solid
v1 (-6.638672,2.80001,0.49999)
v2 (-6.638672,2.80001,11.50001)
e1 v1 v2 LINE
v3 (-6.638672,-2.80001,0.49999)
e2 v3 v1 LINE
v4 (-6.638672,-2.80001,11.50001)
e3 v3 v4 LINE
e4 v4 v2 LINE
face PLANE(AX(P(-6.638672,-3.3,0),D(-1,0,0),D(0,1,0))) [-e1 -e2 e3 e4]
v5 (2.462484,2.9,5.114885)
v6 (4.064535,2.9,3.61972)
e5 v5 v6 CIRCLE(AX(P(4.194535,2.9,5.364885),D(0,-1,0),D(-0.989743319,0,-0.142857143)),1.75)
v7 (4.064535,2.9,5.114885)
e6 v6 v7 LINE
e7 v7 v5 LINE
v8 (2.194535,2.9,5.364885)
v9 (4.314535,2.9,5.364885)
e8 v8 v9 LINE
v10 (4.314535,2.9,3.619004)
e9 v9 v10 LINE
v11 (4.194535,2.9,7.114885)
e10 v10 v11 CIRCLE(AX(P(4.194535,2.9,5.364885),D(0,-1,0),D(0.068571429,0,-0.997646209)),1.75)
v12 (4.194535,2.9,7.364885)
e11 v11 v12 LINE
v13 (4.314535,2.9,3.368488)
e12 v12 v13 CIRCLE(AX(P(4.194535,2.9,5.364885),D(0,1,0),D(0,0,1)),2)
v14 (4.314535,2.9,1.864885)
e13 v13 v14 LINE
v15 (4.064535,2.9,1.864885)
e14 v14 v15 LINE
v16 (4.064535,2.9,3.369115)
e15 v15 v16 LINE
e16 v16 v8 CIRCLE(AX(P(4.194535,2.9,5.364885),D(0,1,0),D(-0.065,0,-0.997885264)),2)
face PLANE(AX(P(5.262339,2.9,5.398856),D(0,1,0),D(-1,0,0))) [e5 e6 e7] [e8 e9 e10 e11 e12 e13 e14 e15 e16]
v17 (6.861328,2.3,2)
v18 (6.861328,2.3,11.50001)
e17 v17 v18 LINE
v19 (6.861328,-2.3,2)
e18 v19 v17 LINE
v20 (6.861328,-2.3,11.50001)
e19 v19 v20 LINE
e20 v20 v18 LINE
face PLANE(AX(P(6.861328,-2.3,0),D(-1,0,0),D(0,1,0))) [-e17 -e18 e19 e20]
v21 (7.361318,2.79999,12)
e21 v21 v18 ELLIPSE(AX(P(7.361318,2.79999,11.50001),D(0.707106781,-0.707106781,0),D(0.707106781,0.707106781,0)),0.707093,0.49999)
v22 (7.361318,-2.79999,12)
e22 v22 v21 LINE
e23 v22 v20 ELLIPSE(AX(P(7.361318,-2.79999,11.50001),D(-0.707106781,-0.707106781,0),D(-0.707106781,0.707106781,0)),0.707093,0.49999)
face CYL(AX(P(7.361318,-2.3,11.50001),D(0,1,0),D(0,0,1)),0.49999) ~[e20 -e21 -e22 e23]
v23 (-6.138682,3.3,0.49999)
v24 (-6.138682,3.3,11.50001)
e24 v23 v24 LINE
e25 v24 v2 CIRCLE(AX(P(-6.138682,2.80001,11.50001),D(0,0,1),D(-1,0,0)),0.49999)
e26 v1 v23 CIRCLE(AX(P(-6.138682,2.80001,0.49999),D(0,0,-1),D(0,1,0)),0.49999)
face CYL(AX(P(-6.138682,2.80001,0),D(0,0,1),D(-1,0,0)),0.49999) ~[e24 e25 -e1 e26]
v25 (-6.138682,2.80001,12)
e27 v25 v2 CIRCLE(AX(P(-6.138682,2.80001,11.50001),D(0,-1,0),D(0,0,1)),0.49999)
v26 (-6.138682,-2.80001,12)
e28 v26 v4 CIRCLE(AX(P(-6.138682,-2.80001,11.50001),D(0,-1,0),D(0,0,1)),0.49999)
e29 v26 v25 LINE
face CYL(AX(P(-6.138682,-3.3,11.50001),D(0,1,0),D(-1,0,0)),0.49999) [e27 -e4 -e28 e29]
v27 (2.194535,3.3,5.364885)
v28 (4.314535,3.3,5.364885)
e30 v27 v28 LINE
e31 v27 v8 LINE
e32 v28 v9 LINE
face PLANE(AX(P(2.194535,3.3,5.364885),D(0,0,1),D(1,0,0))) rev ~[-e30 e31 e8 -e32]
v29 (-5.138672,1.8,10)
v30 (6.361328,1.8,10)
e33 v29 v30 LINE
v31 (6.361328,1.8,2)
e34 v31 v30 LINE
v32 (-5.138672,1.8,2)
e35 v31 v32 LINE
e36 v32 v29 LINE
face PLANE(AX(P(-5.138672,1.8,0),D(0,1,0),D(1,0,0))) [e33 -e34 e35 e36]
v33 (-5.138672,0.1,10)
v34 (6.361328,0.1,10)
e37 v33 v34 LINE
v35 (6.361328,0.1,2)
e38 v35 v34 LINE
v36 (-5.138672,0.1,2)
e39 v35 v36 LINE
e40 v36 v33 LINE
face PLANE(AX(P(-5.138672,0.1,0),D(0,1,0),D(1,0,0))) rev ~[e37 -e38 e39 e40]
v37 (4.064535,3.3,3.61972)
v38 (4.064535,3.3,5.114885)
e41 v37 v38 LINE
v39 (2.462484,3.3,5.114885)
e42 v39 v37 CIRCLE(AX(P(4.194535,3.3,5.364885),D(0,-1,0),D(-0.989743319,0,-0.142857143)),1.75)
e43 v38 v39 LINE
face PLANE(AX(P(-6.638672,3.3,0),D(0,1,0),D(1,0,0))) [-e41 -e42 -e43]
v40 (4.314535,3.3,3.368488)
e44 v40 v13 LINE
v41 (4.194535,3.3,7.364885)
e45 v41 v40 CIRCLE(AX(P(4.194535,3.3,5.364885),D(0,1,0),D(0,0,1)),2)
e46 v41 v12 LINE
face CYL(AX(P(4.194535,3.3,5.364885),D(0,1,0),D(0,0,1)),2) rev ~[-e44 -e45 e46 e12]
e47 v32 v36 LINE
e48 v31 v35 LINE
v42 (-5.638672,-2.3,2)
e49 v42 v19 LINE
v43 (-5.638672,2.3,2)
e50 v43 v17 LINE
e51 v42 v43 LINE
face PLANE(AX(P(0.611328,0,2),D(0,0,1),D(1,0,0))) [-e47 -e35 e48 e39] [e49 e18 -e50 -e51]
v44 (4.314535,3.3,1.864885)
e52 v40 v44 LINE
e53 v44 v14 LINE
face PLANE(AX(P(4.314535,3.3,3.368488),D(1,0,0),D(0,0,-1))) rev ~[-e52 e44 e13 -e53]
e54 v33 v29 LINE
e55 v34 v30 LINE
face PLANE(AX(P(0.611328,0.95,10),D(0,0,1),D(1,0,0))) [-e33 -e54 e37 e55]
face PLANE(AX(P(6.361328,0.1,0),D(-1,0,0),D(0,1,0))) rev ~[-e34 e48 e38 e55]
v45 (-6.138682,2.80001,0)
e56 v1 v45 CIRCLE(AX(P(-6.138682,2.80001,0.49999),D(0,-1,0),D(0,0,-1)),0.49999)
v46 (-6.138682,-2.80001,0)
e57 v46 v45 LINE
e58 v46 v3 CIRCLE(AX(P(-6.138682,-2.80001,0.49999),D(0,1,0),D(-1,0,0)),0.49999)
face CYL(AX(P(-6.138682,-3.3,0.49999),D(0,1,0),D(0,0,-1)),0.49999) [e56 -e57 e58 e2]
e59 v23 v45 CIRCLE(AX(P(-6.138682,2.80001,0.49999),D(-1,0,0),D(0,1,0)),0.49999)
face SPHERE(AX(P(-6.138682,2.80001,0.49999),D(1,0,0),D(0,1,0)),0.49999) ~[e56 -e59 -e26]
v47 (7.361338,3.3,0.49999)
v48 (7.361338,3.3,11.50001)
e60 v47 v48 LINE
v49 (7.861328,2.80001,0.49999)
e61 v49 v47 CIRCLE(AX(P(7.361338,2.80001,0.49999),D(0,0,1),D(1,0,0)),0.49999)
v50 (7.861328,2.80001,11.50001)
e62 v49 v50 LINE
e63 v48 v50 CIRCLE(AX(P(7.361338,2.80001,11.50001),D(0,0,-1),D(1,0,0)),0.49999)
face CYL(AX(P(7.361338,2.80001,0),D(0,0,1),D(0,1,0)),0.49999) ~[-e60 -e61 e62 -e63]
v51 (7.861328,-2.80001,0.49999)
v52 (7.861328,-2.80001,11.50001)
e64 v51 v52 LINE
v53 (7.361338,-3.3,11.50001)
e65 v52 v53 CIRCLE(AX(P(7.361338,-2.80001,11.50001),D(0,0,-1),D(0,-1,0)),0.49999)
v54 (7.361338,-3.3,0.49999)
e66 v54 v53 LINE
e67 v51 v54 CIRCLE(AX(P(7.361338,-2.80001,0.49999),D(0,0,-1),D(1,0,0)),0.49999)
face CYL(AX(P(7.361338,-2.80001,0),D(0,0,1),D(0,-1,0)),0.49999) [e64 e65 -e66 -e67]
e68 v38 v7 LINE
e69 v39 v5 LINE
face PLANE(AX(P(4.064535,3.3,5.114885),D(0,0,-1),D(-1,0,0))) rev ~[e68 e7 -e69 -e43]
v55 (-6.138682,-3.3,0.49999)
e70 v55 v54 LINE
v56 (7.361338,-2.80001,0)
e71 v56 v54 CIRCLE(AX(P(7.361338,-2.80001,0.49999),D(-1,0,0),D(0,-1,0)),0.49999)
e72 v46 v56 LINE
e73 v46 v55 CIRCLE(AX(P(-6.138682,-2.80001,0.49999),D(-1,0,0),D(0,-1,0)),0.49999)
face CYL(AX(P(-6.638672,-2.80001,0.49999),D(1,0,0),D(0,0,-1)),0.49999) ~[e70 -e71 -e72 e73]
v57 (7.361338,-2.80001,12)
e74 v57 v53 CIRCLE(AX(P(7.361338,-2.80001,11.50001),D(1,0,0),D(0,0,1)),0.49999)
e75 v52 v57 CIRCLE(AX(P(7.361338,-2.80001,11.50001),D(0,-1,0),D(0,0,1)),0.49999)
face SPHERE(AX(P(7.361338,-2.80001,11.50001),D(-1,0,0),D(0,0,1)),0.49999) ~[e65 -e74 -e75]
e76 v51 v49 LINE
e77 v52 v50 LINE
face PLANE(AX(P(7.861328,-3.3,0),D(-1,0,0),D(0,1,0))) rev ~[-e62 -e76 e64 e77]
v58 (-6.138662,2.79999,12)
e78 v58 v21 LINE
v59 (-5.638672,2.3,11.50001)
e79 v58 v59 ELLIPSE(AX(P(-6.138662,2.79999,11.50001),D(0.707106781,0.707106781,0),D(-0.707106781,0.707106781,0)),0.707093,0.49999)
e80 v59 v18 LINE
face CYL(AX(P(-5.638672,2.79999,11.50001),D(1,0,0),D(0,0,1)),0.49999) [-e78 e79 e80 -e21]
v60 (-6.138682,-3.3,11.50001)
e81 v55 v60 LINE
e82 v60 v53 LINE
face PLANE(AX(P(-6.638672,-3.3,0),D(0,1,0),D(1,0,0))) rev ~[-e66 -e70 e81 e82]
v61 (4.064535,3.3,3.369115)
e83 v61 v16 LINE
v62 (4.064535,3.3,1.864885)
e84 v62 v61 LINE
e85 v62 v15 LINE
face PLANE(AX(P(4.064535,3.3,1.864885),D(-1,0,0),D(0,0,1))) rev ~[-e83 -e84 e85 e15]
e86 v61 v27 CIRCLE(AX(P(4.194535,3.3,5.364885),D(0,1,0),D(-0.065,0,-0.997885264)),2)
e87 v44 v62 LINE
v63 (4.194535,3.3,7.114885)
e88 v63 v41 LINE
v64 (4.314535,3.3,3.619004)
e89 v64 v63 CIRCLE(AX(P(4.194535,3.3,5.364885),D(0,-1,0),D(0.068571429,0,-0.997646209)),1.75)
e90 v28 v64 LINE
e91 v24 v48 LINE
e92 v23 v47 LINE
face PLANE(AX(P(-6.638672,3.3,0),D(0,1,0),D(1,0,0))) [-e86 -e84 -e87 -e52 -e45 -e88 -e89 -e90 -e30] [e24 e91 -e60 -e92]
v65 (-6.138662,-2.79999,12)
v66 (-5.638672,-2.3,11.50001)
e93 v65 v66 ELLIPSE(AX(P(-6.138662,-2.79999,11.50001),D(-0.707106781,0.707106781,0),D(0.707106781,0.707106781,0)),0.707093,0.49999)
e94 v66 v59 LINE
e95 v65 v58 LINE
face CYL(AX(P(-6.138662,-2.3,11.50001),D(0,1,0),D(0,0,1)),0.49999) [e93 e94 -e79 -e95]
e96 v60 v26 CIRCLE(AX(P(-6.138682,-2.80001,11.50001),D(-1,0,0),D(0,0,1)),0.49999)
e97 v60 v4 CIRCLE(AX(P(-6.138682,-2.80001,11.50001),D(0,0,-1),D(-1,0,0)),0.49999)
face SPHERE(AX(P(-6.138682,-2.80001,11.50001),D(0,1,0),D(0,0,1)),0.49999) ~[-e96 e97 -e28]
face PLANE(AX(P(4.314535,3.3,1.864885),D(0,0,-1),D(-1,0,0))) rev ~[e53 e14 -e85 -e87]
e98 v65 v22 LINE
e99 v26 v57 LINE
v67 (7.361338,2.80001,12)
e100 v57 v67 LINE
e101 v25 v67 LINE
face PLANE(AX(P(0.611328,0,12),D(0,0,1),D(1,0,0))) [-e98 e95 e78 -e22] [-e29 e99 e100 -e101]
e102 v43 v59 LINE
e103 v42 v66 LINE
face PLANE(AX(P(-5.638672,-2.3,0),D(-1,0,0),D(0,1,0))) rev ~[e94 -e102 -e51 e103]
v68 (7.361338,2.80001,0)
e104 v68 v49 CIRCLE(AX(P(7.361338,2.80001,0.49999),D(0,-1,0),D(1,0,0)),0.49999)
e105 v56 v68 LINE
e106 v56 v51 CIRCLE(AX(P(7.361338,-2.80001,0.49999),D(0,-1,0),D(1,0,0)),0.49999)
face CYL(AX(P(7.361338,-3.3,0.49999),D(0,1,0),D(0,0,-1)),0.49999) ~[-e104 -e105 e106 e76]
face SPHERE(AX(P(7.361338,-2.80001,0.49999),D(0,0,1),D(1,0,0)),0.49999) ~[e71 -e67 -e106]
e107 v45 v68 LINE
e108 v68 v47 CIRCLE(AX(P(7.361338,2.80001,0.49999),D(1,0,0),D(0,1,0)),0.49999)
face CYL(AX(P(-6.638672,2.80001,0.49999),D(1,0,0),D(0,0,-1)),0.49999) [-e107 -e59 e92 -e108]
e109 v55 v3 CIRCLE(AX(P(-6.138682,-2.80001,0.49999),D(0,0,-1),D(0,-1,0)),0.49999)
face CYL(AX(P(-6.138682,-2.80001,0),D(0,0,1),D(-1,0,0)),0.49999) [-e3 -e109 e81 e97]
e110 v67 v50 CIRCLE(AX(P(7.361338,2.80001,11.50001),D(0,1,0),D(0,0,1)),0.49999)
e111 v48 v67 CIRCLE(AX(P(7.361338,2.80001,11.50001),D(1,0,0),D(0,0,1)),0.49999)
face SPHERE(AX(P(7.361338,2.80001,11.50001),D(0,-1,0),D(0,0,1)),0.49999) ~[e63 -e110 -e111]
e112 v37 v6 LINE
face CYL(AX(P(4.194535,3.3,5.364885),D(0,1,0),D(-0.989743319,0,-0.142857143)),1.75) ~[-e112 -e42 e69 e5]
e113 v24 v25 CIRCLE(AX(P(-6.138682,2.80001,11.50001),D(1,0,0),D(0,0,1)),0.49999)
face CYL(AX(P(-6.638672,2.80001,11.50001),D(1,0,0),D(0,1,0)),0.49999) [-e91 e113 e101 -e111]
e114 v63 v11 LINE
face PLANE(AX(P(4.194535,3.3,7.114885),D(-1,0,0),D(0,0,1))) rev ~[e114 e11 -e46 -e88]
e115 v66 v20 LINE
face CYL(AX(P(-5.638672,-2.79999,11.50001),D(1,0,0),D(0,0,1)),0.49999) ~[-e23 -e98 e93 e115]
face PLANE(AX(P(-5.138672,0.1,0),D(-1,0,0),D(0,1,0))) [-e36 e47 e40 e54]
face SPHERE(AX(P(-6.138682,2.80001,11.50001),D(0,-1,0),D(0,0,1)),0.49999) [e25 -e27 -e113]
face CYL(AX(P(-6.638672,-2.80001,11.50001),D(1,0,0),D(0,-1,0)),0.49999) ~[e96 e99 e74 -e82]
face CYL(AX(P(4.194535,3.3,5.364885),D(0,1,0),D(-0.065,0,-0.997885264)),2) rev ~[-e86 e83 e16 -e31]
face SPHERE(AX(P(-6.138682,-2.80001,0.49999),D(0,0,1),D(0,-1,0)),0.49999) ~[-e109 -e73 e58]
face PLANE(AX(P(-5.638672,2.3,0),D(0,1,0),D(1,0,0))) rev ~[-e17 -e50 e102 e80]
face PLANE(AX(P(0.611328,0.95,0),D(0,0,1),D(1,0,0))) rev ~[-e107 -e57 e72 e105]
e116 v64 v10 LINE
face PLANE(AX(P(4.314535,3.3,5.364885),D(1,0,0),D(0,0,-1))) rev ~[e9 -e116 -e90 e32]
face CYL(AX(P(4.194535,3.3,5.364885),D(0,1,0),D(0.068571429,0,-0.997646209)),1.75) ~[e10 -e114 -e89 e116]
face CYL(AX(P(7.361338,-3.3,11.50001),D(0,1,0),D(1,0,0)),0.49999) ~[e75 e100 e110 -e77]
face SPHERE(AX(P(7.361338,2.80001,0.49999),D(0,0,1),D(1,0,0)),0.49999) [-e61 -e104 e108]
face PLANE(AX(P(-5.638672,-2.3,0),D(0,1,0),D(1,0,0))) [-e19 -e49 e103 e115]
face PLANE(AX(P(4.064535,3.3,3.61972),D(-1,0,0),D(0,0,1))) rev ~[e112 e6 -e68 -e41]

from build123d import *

# Parameters (mm, degrees)
F0_W     = 14.5
F0_H     = 6.6
F0_W_2   = 12.5
F0_H_2   = 4.6
F1_DEPTH = 12
F0_W_3   = 11.5
F0_H_3   = 1.7
F2_DEPTH = 2
F3_DEPTH = 10
F4_R     = 0.49999
F6_DEPTH = 0.4


# Not quite as in the source:
# - a fillet or chamfer is up to 0.001 mm smaller than in the source, because OpenCascade refuses the exact size


with BuildPart() as f1:
    # F0 (on Top) → F1 (new body)
    with BuildSketch(Plane.XY):
        with Locations((0.6113282288, 0)):
            Rectangle(F0_W, F0_H)
        with Locations((0.6113282288, 0)):
            Rectangle(F0_W_2, F0_H_2, mode=Mode.SUBTRACT)
    extrude(amount=F1_DEPTH)

    # F0 (on Top) → F2 (join)
    with BuildSketch(Plane.XY):
        with Locations((0.6113282288, 0)):
            Rectangle(F0_W_2, F0_H_2)
        with Locations((0.6113282288, 0.95)):
            Rectangle(F0_W_3, F0_H_3, mode=Mode.SUBTRACT)
        with Locations((0.6113282288, 0.95)):
            Rectangle(F0_W_3, F0_H_3)
    extrude(amount=F2_DEPTH)

    # F0 (on Top) → F3 (join)
    with BuildSketch(Plane.XY):
        with Locations((0.6113282288, 0.95)):
            Rectangle(F0_W_3, F0_H_3)
    extrude(amount=F3_DEPTH)

    # F4 (radius 0.5 in the source; OpenCascade refuses exactly that, so slightly less here)
    f4_edges = [f1.edges().sort_by_distance(p)[0] for p in [
        (-6.638672, 0, 12),
        (0.611328, -3.3, 12),
        (7.861328, 0, 12),
        (0.611328, 3.3, 12),
        (-5.638672, 0, 12),
        (0.611328, 2.3, 12),
        (6.861328, 0, 12),
        (0.611328, -2.3, 12),
        (7.861328, 3.3, 6),
        (7.861328, -3.3, 6),
        (7.861328, 0, 0),
        (0.611328, 3.3, 0),
        (-6.638672, 3.3, 6),
        (-6.638672, -3.3, 6),
        (0.611328, -3.3, 0),
        (-6.638672, 0, 0),
    ]]
    fillet(f4_edges, radius=F4_R)

    # F5 (on face) → F6 (cut)
    with BuildSketch(Plane(origin=(0, 3.3, 0), x_dir=(-1, 0, 0), z_dir=(0, 1, 0))):
        with BuildLine():
            Line((-4.1945352975, 7.1148852238), (-4.1945352975, 7.3648852238))
            ThreePointArc((-4.1945352975, 7.3648852238), (-6.193634283, 5.4249122664), (-4.3145352975, 3.3684884696))
            Line((-4.3145352975, 3.3684884696), (-4.3145352975, 3.6190043573))
            ThreePointArc((-4.3145352975, 3.6190043573), (-5.9435052109, 5.4249205618), (-4.1945352975, 7.1148852238))
        make_face()
        with BuildLine():
            Line((-4.3145352975, 3.6190043573), (-4.3145352975, 3.3684884696))
            ThreePointArc((-4.3145352975, 3.3684884696), (-4.1895255031, 3.3648914983), (-4.0645352975, 3.3691146959))
            Line((-4.0645352975, 3.3691146959), (-4.0645352975, 3.6197204751))
            ThreePointArc((-4.0645352975, 3.6197204751), (-4.1895224932, 3.6148924033), (-4.3145352975, 3.6190043573))
        make_face()
        with BuildLine():
            ThreePointArc((-4.0645352975, 3.3691146959), (-4.1895255031, 3.3648914983), (-4.3145352975, 3.3684884696))
            Line((-4.3145352975, 3.3684884696), (-4.3145352975, 1.8648852238))
            Line((-4.3145352975, 1.8648852238), (-4.0645352975, 1.8648852238))
            Line((-4.0645352975, 1.8648852238), (-4.0645352975, 3.3691146959))
        make_face()
        with BuildLine():
            Line((-4.0645352975, 3.6197204751), (-4.0645352975, 3.3691146959))
            ThreePointArc((-4.0645352975, 3.3691146959), (-2.7350833455, 3.9974057907), (-2.1945352975, 5.3648852238))
            Line((-2.1945352975, 5.3648852238), (-2.4445352975, 5.3648852238))
            ThreePointArc((-2.4445352975, 5.3648852238), (-2.4490283635, 5.2395634644), (-2.4624844899, 5.1148852238))
            ThreePointArc((-2.4624844899, 5.1148852238), (-3.000513644, 4.0855055729), (-4.0645352975, 3.6197204751))
        make_face()
        with BuildLine():
            Line((-4.3145352975, 5.3648852238), (-4.3145352975, 3.6190043573))
            ThreePointArc((-4.3145352975, 3.6190043573), (-4.1895224932, 3.6148924033), (-4.0645352975, 3.6197204751))
            Line((-4.0645352975, 3.6197204751), (-4.0645352975, 5.1148852238))
            Line((-4.0645352975, 5.1148852238), (-2.4624844899, 5.1148852238))
            ThreePointArc((-2.4624844899, 5.1148852238), (-2.4490283635, 5.2395634644), (-2.4445352975, 5.3648852238))
            Line((-2.4445352975, 5.3648852238), (-4.3145352975, 5.3648852238))
        make_face()
    extrude(amount=-F6_DEPTH, mode=Mode.SUBTRACT)


solid = f1.part
